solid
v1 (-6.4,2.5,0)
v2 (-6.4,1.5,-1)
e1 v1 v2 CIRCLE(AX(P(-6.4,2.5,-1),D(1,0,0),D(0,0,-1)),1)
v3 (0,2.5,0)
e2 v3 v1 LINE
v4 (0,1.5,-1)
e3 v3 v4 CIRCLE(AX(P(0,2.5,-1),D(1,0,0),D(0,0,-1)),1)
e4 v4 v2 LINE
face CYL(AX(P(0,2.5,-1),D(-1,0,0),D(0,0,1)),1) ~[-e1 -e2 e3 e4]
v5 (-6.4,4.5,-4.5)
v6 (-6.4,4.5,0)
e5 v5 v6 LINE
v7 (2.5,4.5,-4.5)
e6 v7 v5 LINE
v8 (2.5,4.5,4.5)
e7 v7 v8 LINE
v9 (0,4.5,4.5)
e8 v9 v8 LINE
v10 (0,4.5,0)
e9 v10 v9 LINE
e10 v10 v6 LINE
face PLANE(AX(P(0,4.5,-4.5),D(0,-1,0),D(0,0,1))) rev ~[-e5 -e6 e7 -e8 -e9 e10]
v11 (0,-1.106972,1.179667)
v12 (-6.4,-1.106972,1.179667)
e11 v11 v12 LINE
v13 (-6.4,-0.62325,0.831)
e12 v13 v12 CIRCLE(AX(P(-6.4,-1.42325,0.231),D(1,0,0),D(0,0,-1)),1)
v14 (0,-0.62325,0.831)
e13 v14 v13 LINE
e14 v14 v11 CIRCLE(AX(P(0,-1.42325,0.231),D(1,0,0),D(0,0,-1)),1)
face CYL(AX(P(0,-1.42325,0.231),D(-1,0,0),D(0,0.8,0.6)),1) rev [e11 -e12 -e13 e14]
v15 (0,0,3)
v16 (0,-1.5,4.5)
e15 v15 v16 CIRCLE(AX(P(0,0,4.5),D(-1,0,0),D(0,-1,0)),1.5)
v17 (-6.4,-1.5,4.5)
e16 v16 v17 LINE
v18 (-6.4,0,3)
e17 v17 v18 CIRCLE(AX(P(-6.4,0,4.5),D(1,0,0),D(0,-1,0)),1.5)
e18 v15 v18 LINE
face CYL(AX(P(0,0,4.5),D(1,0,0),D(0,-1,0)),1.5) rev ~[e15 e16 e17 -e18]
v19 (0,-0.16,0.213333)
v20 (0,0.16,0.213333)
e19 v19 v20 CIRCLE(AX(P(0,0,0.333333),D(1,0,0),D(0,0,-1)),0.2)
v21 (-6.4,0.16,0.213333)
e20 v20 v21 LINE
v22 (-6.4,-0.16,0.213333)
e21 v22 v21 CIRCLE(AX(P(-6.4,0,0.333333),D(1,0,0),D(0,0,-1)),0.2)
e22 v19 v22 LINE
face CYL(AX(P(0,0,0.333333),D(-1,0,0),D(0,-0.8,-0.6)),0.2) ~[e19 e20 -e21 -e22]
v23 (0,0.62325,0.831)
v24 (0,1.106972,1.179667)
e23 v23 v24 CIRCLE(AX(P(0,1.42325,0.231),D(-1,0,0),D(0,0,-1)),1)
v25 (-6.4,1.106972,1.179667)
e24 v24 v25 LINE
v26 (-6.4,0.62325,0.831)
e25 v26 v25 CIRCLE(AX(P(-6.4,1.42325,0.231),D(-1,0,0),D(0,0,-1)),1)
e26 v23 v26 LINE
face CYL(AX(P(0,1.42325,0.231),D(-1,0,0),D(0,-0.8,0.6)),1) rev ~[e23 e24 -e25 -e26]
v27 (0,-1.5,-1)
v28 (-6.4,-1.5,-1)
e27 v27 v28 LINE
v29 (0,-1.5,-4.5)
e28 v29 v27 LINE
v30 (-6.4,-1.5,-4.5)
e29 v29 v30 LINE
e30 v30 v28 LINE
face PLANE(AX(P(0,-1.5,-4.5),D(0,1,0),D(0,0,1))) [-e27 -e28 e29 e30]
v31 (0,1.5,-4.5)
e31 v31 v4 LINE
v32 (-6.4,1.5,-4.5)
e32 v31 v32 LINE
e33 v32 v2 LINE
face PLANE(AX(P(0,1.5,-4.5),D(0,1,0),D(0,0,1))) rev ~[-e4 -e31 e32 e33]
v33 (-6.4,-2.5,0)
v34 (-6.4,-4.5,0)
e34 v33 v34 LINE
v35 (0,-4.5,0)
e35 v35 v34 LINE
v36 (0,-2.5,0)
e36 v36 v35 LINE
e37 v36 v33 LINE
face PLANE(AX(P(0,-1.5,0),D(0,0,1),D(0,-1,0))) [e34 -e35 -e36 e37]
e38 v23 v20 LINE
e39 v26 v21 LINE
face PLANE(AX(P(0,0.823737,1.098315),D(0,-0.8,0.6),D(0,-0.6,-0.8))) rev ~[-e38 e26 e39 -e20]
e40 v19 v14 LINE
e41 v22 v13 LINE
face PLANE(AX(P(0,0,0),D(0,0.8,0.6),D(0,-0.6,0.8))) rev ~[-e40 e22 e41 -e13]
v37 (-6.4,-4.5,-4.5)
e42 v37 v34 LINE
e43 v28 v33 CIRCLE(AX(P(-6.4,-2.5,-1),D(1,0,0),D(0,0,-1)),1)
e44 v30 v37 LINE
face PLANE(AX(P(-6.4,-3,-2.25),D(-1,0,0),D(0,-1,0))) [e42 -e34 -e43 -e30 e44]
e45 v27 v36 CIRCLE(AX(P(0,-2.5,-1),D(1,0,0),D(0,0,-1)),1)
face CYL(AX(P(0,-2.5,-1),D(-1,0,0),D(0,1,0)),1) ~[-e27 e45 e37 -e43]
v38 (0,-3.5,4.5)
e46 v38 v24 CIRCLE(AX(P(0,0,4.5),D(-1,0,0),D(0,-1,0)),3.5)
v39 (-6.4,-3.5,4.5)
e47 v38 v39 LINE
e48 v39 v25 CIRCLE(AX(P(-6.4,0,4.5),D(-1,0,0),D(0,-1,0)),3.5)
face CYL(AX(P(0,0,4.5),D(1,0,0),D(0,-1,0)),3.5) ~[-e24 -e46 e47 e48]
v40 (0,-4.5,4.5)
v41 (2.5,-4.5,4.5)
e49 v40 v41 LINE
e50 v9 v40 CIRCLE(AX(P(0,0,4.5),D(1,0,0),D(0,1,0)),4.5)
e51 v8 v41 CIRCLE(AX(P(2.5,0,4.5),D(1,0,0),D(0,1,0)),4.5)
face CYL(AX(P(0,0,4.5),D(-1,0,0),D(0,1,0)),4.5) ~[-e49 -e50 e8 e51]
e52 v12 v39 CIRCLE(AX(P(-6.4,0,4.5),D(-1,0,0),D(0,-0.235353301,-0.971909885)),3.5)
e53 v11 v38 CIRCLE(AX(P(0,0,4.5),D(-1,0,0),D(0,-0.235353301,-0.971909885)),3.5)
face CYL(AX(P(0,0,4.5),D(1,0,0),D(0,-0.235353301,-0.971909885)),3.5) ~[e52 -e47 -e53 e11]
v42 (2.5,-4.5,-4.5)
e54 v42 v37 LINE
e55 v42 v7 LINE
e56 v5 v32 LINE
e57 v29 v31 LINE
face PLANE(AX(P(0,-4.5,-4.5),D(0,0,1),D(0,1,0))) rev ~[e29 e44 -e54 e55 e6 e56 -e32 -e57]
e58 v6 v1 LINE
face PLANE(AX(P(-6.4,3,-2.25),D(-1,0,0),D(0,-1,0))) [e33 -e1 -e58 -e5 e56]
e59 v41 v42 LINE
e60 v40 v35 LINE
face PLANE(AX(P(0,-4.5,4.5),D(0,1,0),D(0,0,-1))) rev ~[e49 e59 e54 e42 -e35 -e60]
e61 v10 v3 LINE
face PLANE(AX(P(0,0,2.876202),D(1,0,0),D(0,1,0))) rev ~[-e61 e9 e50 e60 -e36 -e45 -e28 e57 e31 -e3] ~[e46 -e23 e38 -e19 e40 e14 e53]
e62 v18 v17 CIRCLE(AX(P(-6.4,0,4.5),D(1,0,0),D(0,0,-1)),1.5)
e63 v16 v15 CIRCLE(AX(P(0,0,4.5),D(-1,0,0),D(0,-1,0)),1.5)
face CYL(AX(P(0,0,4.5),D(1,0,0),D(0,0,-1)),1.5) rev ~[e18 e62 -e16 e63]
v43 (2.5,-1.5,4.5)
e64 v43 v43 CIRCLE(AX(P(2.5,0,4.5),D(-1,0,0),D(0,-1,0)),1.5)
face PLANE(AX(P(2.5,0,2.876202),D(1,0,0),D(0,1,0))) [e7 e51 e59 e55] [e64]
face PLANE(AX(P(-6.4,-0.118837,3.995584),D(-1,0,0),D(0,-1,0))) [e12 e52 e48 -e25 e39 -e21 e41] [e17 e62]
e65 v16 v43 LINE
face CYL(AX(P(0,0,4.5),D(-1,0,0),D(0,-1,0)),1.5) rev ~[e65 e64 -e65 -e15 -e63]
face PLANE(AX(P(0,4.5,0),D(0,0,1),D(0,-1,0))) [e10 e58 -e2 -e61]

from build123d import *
from build123d import SkipClean  # not in build123d's __all__

# Parameters (mm, degrees)
F1_DEPTH = 2.5
F2_W     = 3
F2_H     = 4.5
F3_DEPTH = 6.4
F4_R     = 1
F5_R     = 0.2


with BuildPart() as f1:
    # F0 (on Right) → F1 (new body)
    with BuildSketch(Plane.YZ):
        with BuildLine():
            ThreePointArc((-4.5, 4.5), (0, 0), (4.5, 4.5))
            Line((4.5, 4.5), (1.5, 4.5))
            ThreePointArc((1.5, 4.5), (0, 3), (-1.5, 4.5))
            Line((-1.5, 4.5), (-4.5, 4.5))
        make_face()
        with BuildLine():
            Line((1.5, 4.5), (4.5, 4.5))
            ThreePointArc((4.5, 4.5), (0, 9), (-4.5, 4.5))
            Line((-4.5, 4.5), (-1.5, 4.5))
            ThreePointArc((-1.5, 4.5), (0, 6), (1.5, 4.5))
        make_face()
        with BuildLine():
            Line((-4.5, -4.5), (4.5, -4.5))
            Line((4.5, -4.5), (4.5, 4.5))
            ThreePointArc((4.5, 4.5), (0, 0), (-4.5, 4.5))
            Line((-4.5, 4.5), (-4.5, -4.5))
        make_face()
    extrude(amount=F1_DEPTH)

    # F2 (on face) → F3 (join)
    with BuildSketch(Plane(origin=(0, 0, 0), x_dir=(0, -1, 0), z_dir=(-1, 0, 0))):
        with BuildLine():
            ThreePointArc((0.8237365529, 1.0983154039), (2.7507342597, 2.3358694512), (3.5, 4.5))
            ThreePointArc((3.5, 4.5), (-2.1641305488, 7.2507342597), (-0.8237365529, 1.0983154039))
            Line((-0.8237365529, 1.0983154039), (-1.5, 2))
            Line((-1.5, 2), (0, 2))
            Line((0, 2), (1.5, 2))
            Line((1.5, 2), (0.8237365529, 1.0983154039))
        make_face()
        with BuildLine():
            ThreePointArc((1.5, 4.5), (1.0606601718, 3.4393398282), (0, 3))
            ThreePointArc((0, 3), (-1.0606601718, 5.5606601718), (1.5, 4.5))
        make_face(mode=Mode.SUBTRACT)
        with BuildLine():
            Line((-1.5, 2), (-0.8237365529, 1.0983154039))
            ThreePointArc((-0.8237365529, 1.0983154039), (-0.4147914618, 1.0246657653), (0, 1))
            Line((0, 1), (0, 2))
            Line((0, 2), (-1.5, 2))
        make_face()
        with BuildLine():
            ThreePointArc((0, 1), (-0.4147914618, 1.0246657653), (-0.8237365529, 1.0983154039))
            Line((-0.8237365529, 1.0983154039), (0, 0))
            Line((0, 0), (0, 1))
        make_face()
        with BuildLine():
            Line((0, 0), (0.8237365529, 1.0983154039))
            ThreePointArc((0.8237365529, 1.0983154039), (0.4147914618, 1.0246657653), (0, 1))
            Line((0, 1), (0, 0))
        make_face()
        with BuildLine():
            ThreePointArc((0, 1), (0.4147914618, 1.0246657653), (0.8237365529, 1.0983154039))
            Line((0.8237365529, 1.0983154039), (1.5, 2))
            Line((1.5, 2), (0, 2))
            Line((0, 2), (0, 1))
        make_face()
        with Locations((-3, -2.25)):
            Rectangle(F2_W, F2_H)
        with Locations((3, -2.25)):
            Rectangle(F2_W, F2_H)
    with SkipClean():  # cleaning this boolean's faces spoils the solid; the shape is the same uncleaned
        extrude(amount=F3_DEPTH)

    # F4
    f4_edges = [f1.edges().sort_by_distance(p)[0] for p in [
        (-3.2, 1.5, 0),
        (-3.2, -1.5, 0),
        (-3.2, 0.823737, 1.098315),
        (-3.2, -0.823737, 1.098315),
    ]]
    fillet(f4_edges, radius=F4_R)

    # F5
    f5_edges = [f1.edges().sort_by_distance(p)[0] for p in [
        (-3.2, 0, 0),
    ]]
    fillet(f5_edges, radius=F5_R)


solid = f1.part
